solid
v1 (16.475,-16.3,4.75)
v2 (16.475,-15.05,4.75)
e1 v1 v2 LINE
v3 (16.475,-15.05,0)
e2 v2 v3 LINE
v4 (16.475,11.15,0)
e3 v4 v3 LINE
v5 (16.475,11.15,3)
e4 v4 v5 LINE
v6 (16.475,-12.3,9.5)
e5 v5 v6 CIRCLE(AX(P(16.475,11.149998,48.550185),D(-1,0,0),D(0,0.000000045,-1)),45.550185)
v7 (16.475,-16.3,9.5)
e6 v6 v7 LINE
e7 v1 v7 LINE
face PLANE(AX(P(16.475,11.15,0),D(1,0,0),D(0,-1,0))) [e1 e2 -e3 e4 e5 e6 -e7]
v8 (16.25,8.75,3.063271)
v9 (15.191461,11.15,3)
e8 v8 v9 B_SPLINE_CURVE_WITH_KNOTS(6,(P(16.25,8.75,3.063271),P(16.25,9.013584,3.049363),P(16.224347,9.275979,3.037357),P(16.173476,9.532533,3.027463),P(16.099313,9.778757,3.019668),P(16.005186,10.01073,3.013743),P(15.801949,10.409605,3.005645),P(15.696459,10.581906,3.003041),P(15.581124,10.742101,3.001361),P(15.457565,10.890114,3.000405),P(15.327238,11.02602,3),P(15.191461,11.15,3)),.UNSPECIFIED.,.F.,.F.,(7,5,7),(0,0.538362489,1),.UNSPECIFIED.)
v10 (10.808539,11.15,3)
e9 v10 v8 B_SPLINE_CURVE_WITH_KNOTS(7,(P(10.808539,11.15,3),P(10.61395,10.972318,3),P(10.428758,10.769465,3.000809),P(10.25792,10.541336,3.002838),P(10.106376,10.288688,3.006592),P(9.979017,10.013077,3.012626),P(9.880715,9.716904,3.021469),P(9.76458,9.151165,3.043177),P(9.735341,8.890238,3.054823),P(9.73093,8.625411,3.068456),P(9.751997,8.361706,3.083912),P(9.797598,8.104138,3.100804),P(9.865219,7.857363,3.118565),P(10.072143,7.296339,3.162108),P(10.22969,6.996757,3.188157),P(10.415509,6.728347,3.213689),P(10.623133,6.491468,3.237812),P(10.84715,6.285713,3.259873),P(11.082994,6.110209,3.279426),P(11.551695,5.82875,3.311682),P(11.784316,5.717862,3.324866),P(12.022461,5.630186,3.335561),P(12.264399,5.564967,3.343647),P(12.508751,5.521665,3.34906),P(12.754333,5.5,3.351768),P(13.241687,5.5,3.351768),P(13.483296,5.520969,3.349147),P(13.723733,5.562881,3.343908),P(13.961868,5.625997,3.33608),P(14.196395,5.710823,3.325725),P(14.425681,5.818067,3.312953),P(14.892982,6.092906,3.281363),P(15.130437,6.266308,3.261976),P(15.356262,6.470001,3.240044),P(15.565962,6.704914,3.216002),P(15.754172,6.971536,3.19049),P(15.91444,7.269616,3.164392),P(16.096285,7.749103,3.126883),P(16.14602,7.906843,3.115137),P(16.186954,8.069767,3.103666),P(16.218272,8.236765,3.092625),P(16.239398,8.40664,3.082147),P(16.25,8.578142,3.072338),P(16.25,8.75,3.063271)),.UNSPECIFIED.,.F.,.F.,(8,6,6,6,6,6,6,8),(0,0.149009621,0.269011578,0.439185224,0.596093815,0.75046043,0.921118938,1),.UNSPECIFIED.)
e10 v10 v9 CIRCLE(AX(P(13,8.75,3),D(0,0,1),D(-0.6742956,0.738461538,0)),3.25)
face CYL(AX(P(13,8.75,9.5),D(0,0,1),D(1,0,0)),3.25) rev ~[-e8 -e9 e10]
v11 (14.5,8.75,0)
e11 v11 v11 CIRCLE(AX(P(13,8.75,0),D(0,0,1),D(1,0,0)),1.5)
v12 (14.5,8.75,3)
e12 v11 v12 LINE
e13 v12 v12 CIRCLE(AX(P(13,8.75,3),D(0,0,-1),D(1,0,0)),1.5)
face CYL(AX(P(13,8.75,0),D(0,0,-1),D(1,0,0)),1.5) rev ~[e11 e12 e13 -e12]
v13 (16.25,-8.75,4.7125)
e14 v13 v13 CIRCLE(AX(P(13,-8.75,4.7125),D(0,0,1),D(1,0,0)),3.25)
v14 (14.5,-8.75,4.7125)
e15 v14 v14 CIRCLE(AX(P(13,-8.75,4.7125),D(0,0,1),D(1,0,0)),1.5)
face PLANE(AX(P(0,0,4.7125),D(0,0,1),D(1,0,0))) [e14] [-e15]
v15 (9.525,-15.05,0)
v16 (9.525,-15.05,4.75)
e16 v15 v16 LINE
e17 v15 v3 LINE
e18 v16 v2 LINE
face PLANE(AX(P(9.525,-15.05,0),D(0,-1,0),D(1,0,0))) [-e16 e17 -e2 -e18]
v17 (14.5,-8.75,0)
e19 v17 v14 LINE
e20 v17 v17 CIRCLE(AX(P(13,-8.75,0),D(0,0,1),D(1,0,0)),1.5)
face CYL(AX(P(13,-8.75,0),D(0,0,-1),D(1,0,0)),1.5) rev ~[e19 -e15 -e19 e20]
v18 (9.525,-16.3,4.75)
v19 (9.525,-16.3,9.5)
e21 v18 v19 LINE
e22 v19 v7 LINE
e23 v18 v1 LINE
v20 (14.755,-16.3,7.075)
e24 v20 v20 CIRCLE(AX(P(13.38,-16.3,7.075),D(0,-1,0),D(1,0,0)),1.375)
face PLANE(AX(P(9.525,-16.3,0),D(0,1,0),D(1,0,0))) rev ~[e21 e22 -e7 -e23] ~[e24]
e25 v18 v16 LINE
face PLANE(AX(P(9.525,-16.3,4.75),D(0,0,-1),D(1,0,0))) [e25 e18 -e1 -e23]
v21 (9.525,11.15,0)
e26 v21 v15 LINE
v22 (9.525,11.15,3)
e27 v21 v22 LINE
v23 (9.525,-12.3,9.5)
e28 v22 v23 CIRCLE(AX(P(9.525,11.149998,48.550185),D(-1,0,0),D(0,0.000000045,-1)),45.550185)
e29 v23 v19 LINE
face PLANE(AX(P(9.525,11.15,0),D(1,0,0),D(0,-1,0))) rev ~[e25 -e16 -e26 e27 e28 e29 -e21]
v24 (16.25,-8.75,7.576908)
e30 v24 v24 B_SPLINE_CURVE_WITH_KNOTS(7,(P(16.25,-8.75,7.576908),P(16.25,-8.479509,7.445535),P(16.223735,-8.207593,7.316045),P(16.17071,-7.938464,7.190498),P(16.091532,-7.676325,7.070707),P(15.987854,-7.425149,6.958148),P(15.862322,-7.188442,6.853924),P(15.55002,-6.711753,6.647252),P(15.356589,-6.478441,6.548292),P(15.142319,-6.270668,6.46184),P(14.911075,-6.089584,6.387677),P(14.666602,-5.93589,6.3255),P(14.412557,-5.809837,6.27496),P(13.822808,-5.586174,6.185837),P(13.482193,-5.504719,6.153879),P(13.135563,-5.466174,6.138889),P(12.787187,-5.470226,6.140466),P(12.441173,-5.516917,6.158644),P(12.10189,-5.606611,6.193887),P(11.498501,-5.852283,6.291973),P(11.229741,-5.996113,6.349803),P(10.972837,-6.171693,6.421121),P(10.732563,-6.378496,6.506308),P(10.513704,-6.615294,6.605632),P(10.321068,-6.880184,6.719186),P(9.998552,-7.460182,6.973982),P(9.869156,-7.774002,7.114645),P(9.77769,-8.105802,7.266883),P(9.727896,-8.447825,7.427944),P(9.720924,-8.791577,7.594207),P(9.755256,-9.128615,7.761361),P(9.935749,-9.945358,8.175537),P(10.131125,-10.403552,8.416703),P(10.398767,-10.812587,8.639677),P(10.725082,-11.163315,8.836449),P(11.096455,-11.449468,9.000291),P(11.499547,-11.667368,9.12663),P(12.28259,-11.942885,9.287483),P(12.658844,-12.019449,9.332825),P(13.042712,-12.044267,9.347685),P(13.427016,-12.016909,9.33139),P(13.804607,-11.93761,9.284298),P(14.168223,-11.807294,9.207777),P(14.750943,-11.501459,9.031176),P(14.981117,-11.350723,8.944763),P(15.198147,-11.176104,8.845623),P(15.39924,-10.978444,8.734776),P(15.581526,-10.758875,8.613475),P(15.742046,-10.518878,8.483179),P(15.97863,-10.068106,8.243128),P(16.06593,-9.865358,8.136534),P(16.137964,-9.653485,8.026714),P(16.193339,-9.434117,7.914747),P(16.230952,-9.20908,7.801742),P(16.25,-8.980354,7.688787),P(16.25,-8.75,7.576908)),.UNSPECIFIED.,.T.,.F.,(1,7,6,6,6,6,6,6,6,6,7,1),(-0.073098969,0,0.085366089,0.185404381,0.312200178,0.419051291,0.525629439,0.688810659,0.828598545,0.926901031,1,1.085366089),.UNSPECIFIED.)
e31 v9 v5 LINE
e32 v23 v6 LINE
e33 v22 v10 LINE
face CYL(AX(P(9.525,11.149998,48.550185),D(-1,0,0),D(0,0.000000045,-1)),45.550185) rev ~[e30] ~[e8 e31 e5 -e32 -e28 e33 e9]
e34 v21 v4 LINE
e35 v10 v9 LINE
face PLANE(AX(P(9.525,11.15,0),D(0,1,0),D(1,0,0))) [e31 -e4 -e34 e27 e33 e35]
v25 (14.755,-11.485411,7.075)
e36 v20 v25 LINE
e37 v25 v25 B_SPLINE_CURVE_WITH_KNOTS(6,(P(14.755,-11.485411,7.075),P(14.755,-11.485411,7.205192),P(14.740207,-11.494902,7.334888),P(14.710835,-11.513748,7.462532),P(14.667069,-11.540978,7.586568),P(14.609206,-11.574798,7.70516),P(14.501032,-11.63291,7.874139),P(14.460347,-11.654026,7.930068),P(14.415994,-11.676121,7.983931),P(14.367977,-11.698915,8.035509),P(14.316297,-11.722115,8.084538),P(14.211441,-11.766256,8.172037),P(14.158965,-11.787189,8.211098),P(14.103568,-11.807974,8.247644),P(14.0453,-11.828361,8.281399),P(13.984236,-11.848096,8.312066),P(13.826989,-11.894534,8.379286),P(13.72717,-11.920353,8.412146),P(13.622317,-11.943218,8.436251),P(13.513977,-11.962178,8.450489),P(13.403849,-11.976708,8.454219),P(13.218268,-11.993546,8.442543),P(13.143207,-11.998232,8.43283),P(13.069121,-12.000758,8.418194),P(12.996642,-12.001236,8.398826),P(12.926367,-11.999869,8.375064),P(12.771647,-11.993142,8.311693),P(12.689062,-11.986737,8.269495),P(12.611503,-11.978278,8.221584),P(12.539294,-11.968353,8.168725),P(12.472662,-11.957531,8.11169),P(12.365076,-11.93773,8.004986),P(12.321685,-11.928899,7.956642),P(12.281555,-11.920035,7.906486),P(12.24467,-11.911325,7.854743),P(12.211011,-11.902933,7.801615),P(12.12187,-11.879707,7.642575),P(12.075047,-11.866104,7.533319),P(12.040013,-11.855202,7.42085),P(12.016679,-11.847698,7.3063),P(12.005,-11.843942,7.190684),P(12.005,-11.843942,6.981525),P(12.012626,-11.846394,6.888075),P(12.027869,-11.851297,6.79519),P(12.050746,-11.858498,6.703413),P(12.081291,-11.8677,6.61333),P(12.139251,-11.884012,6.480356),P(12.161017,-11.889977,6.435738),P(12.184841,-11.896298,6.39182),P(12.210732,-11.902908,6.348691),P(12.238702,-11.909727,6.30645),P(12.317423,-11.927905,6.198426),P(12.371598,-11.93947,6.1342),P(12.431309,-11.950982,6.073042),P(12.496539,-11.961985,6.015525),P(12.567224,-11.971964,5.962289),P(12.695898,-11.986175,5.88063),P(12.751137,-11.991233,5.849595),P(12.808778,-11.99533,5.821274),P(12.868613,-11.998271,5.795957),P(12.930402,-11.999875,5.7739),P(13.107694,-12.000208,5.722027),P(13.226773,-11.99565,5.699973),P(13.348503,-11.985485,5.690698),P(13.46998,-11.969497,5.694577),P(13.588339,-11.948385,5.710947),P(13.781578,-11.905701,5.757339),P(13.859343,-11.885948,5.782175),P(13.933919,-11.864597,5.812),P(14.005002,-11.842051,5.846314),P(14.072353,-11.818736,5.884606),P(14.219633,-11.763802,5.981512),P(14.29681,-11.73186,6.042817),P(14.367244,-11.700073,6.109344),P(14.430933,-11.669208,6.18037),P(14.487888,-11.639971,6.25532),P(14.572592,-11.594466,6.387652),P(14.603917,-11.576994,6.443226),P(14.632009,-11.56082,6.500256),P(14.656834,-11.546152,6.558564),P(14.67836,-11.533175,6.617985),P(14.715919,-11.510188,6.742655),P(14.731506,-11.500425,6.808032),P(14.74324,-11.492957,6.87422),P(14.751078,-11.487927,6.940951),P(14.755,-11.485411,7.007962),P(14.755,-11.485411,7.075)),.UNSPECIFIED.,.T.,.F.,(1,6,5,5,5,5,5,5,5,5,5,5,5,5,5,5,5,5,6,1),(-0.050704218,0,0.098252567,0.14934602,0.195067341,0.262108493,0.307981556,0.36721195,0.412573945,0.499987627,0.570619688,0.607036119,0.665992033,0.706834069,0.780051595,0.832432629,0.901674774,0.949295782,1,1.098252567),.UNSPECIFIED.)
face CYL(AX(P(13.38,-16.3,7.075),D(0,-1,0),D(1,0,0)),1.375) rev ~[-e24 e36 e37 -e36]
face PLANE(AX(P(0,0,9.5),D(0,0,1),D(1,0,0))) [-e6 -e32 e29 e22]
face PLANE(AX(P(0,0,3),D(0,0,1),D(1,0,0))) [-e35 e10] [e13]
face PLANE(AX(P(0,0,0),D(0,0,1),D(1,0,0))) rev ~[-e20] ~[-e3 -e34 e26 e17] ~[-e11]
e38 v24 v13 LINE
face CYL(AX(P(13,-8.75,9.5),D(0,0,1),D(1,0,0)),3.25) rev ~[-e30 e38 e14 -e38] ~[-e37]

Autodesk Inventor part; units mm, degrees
ref_plane "YZ Plane" through (0, 0, 0) normal (1, 0, 0) x (0, 1, 0)
ref_plane "XZ Plane" through (0, 0, 0) normal (0, 1, 0) x (-1, 0, 0)
ref_plane "XY Plane" through (0, 0, 0) normal (0, 0, 1) x (1, 0, 0)
sketch "Sketch1" plane through (0, 0, 0) normal (0, 0, 1) x (1, 0, 0)
  circle A0 centre (13, 8.75) radius 1.5 projected
  circle A1 centre (13, -8.75) radius 1.5 projected
  line L0 (9.525, 11.15) -> (16.475, 11.15)
  line L1 (16.475, 11.15) -> (16.475, -16.3)
  line L2 (9.525, 11.15) -> (9.525, -16.3)
  line L3 (9.525, -16.3) -> (16.475, -16.3)
  point P0 (0, 0)
  dimension "d0" = 27.45
  dimension "d1" = 3.475
  dimension "d2" = 2.4
  dimension "d3" = 3.475
extrude "Extrusion1" add sketch "Sketch1" along normal blind 9.5
sketch "Sketch2" plane through (9.525, -16.3, 0) normal (-1, 0, 0) x (0, 0, 1)
  line L0 (0, 27.45) -> (9.5, 27.45) projected
  line L1 (9.5, 0) -> (9.5, 27.45) projected
  arc A0 (3, 27.45) -> (9.5, 4) centre (48.5502, 27.45) ccw
  line L2 (0, 27.45) -> (9.5, 27.45) projected
  point P0 (0, 16.3)
  dimension "d6" = 3
  dimension "d7" = 4
extrude "Extrusion2" cut sketch "Sketch2" against normal blind 10
sketch "Sketch3" plane through (9.525, -16.3, 0) normal (0, -1, 0) x (1, 0, 0)
  line L0 (0, 0) -> (0, 9.5) projected
  line L1 (0, 0) -> (6.95, 0) projected
  line L2 (0, 4.75) -> (6.95, 4.75)
  line L3 (6.95, 4.75) -> (6.95, 0)
  line L4 (6.95, 0) -> (0, 0)
  line L5 (0, 0) -> (0, 4.75)
  circle A0 centre (3.855, 7.075) radius 1.375
  point P0 (-9.525, 0)
  dimension "d14" = 3.855
  dimension "d15" = 2.325
  dimension "d16" = 2.75
extrude "Extrusion3" cut sketch "Sketch3" against normal blind 7.9125 contours A0
extrude "Extrusion4" cut sketch "Sketch3" against normal blind 1.25 contours L0 L2 L3 L1
sketch "Sketch4" plane through (0, 0, 9.5) normal (0, 0, 1) x (1, 0, 0)
  circle A0 centre (13, -8.75) radius 3.25
  circle A1 centre (13, 8.75) radius 3.25
  circle A2 centre (13, -8.75) radius 1.5 projected
  circle A3 centre (13, 8.75) radius 1.5 projected
  point P0 (0, 0)
  dimension "d17" = 6.5
extrude "Extrusion5" cut sketch "Sketch4" against normal blind 4.7875 contours A0
extrude "Extrusion6" cut sketch "Sketch4" against normal up to surface (6.5 mm away) contours A1 | A3
properties part number "ENCODERV2PLATE"
